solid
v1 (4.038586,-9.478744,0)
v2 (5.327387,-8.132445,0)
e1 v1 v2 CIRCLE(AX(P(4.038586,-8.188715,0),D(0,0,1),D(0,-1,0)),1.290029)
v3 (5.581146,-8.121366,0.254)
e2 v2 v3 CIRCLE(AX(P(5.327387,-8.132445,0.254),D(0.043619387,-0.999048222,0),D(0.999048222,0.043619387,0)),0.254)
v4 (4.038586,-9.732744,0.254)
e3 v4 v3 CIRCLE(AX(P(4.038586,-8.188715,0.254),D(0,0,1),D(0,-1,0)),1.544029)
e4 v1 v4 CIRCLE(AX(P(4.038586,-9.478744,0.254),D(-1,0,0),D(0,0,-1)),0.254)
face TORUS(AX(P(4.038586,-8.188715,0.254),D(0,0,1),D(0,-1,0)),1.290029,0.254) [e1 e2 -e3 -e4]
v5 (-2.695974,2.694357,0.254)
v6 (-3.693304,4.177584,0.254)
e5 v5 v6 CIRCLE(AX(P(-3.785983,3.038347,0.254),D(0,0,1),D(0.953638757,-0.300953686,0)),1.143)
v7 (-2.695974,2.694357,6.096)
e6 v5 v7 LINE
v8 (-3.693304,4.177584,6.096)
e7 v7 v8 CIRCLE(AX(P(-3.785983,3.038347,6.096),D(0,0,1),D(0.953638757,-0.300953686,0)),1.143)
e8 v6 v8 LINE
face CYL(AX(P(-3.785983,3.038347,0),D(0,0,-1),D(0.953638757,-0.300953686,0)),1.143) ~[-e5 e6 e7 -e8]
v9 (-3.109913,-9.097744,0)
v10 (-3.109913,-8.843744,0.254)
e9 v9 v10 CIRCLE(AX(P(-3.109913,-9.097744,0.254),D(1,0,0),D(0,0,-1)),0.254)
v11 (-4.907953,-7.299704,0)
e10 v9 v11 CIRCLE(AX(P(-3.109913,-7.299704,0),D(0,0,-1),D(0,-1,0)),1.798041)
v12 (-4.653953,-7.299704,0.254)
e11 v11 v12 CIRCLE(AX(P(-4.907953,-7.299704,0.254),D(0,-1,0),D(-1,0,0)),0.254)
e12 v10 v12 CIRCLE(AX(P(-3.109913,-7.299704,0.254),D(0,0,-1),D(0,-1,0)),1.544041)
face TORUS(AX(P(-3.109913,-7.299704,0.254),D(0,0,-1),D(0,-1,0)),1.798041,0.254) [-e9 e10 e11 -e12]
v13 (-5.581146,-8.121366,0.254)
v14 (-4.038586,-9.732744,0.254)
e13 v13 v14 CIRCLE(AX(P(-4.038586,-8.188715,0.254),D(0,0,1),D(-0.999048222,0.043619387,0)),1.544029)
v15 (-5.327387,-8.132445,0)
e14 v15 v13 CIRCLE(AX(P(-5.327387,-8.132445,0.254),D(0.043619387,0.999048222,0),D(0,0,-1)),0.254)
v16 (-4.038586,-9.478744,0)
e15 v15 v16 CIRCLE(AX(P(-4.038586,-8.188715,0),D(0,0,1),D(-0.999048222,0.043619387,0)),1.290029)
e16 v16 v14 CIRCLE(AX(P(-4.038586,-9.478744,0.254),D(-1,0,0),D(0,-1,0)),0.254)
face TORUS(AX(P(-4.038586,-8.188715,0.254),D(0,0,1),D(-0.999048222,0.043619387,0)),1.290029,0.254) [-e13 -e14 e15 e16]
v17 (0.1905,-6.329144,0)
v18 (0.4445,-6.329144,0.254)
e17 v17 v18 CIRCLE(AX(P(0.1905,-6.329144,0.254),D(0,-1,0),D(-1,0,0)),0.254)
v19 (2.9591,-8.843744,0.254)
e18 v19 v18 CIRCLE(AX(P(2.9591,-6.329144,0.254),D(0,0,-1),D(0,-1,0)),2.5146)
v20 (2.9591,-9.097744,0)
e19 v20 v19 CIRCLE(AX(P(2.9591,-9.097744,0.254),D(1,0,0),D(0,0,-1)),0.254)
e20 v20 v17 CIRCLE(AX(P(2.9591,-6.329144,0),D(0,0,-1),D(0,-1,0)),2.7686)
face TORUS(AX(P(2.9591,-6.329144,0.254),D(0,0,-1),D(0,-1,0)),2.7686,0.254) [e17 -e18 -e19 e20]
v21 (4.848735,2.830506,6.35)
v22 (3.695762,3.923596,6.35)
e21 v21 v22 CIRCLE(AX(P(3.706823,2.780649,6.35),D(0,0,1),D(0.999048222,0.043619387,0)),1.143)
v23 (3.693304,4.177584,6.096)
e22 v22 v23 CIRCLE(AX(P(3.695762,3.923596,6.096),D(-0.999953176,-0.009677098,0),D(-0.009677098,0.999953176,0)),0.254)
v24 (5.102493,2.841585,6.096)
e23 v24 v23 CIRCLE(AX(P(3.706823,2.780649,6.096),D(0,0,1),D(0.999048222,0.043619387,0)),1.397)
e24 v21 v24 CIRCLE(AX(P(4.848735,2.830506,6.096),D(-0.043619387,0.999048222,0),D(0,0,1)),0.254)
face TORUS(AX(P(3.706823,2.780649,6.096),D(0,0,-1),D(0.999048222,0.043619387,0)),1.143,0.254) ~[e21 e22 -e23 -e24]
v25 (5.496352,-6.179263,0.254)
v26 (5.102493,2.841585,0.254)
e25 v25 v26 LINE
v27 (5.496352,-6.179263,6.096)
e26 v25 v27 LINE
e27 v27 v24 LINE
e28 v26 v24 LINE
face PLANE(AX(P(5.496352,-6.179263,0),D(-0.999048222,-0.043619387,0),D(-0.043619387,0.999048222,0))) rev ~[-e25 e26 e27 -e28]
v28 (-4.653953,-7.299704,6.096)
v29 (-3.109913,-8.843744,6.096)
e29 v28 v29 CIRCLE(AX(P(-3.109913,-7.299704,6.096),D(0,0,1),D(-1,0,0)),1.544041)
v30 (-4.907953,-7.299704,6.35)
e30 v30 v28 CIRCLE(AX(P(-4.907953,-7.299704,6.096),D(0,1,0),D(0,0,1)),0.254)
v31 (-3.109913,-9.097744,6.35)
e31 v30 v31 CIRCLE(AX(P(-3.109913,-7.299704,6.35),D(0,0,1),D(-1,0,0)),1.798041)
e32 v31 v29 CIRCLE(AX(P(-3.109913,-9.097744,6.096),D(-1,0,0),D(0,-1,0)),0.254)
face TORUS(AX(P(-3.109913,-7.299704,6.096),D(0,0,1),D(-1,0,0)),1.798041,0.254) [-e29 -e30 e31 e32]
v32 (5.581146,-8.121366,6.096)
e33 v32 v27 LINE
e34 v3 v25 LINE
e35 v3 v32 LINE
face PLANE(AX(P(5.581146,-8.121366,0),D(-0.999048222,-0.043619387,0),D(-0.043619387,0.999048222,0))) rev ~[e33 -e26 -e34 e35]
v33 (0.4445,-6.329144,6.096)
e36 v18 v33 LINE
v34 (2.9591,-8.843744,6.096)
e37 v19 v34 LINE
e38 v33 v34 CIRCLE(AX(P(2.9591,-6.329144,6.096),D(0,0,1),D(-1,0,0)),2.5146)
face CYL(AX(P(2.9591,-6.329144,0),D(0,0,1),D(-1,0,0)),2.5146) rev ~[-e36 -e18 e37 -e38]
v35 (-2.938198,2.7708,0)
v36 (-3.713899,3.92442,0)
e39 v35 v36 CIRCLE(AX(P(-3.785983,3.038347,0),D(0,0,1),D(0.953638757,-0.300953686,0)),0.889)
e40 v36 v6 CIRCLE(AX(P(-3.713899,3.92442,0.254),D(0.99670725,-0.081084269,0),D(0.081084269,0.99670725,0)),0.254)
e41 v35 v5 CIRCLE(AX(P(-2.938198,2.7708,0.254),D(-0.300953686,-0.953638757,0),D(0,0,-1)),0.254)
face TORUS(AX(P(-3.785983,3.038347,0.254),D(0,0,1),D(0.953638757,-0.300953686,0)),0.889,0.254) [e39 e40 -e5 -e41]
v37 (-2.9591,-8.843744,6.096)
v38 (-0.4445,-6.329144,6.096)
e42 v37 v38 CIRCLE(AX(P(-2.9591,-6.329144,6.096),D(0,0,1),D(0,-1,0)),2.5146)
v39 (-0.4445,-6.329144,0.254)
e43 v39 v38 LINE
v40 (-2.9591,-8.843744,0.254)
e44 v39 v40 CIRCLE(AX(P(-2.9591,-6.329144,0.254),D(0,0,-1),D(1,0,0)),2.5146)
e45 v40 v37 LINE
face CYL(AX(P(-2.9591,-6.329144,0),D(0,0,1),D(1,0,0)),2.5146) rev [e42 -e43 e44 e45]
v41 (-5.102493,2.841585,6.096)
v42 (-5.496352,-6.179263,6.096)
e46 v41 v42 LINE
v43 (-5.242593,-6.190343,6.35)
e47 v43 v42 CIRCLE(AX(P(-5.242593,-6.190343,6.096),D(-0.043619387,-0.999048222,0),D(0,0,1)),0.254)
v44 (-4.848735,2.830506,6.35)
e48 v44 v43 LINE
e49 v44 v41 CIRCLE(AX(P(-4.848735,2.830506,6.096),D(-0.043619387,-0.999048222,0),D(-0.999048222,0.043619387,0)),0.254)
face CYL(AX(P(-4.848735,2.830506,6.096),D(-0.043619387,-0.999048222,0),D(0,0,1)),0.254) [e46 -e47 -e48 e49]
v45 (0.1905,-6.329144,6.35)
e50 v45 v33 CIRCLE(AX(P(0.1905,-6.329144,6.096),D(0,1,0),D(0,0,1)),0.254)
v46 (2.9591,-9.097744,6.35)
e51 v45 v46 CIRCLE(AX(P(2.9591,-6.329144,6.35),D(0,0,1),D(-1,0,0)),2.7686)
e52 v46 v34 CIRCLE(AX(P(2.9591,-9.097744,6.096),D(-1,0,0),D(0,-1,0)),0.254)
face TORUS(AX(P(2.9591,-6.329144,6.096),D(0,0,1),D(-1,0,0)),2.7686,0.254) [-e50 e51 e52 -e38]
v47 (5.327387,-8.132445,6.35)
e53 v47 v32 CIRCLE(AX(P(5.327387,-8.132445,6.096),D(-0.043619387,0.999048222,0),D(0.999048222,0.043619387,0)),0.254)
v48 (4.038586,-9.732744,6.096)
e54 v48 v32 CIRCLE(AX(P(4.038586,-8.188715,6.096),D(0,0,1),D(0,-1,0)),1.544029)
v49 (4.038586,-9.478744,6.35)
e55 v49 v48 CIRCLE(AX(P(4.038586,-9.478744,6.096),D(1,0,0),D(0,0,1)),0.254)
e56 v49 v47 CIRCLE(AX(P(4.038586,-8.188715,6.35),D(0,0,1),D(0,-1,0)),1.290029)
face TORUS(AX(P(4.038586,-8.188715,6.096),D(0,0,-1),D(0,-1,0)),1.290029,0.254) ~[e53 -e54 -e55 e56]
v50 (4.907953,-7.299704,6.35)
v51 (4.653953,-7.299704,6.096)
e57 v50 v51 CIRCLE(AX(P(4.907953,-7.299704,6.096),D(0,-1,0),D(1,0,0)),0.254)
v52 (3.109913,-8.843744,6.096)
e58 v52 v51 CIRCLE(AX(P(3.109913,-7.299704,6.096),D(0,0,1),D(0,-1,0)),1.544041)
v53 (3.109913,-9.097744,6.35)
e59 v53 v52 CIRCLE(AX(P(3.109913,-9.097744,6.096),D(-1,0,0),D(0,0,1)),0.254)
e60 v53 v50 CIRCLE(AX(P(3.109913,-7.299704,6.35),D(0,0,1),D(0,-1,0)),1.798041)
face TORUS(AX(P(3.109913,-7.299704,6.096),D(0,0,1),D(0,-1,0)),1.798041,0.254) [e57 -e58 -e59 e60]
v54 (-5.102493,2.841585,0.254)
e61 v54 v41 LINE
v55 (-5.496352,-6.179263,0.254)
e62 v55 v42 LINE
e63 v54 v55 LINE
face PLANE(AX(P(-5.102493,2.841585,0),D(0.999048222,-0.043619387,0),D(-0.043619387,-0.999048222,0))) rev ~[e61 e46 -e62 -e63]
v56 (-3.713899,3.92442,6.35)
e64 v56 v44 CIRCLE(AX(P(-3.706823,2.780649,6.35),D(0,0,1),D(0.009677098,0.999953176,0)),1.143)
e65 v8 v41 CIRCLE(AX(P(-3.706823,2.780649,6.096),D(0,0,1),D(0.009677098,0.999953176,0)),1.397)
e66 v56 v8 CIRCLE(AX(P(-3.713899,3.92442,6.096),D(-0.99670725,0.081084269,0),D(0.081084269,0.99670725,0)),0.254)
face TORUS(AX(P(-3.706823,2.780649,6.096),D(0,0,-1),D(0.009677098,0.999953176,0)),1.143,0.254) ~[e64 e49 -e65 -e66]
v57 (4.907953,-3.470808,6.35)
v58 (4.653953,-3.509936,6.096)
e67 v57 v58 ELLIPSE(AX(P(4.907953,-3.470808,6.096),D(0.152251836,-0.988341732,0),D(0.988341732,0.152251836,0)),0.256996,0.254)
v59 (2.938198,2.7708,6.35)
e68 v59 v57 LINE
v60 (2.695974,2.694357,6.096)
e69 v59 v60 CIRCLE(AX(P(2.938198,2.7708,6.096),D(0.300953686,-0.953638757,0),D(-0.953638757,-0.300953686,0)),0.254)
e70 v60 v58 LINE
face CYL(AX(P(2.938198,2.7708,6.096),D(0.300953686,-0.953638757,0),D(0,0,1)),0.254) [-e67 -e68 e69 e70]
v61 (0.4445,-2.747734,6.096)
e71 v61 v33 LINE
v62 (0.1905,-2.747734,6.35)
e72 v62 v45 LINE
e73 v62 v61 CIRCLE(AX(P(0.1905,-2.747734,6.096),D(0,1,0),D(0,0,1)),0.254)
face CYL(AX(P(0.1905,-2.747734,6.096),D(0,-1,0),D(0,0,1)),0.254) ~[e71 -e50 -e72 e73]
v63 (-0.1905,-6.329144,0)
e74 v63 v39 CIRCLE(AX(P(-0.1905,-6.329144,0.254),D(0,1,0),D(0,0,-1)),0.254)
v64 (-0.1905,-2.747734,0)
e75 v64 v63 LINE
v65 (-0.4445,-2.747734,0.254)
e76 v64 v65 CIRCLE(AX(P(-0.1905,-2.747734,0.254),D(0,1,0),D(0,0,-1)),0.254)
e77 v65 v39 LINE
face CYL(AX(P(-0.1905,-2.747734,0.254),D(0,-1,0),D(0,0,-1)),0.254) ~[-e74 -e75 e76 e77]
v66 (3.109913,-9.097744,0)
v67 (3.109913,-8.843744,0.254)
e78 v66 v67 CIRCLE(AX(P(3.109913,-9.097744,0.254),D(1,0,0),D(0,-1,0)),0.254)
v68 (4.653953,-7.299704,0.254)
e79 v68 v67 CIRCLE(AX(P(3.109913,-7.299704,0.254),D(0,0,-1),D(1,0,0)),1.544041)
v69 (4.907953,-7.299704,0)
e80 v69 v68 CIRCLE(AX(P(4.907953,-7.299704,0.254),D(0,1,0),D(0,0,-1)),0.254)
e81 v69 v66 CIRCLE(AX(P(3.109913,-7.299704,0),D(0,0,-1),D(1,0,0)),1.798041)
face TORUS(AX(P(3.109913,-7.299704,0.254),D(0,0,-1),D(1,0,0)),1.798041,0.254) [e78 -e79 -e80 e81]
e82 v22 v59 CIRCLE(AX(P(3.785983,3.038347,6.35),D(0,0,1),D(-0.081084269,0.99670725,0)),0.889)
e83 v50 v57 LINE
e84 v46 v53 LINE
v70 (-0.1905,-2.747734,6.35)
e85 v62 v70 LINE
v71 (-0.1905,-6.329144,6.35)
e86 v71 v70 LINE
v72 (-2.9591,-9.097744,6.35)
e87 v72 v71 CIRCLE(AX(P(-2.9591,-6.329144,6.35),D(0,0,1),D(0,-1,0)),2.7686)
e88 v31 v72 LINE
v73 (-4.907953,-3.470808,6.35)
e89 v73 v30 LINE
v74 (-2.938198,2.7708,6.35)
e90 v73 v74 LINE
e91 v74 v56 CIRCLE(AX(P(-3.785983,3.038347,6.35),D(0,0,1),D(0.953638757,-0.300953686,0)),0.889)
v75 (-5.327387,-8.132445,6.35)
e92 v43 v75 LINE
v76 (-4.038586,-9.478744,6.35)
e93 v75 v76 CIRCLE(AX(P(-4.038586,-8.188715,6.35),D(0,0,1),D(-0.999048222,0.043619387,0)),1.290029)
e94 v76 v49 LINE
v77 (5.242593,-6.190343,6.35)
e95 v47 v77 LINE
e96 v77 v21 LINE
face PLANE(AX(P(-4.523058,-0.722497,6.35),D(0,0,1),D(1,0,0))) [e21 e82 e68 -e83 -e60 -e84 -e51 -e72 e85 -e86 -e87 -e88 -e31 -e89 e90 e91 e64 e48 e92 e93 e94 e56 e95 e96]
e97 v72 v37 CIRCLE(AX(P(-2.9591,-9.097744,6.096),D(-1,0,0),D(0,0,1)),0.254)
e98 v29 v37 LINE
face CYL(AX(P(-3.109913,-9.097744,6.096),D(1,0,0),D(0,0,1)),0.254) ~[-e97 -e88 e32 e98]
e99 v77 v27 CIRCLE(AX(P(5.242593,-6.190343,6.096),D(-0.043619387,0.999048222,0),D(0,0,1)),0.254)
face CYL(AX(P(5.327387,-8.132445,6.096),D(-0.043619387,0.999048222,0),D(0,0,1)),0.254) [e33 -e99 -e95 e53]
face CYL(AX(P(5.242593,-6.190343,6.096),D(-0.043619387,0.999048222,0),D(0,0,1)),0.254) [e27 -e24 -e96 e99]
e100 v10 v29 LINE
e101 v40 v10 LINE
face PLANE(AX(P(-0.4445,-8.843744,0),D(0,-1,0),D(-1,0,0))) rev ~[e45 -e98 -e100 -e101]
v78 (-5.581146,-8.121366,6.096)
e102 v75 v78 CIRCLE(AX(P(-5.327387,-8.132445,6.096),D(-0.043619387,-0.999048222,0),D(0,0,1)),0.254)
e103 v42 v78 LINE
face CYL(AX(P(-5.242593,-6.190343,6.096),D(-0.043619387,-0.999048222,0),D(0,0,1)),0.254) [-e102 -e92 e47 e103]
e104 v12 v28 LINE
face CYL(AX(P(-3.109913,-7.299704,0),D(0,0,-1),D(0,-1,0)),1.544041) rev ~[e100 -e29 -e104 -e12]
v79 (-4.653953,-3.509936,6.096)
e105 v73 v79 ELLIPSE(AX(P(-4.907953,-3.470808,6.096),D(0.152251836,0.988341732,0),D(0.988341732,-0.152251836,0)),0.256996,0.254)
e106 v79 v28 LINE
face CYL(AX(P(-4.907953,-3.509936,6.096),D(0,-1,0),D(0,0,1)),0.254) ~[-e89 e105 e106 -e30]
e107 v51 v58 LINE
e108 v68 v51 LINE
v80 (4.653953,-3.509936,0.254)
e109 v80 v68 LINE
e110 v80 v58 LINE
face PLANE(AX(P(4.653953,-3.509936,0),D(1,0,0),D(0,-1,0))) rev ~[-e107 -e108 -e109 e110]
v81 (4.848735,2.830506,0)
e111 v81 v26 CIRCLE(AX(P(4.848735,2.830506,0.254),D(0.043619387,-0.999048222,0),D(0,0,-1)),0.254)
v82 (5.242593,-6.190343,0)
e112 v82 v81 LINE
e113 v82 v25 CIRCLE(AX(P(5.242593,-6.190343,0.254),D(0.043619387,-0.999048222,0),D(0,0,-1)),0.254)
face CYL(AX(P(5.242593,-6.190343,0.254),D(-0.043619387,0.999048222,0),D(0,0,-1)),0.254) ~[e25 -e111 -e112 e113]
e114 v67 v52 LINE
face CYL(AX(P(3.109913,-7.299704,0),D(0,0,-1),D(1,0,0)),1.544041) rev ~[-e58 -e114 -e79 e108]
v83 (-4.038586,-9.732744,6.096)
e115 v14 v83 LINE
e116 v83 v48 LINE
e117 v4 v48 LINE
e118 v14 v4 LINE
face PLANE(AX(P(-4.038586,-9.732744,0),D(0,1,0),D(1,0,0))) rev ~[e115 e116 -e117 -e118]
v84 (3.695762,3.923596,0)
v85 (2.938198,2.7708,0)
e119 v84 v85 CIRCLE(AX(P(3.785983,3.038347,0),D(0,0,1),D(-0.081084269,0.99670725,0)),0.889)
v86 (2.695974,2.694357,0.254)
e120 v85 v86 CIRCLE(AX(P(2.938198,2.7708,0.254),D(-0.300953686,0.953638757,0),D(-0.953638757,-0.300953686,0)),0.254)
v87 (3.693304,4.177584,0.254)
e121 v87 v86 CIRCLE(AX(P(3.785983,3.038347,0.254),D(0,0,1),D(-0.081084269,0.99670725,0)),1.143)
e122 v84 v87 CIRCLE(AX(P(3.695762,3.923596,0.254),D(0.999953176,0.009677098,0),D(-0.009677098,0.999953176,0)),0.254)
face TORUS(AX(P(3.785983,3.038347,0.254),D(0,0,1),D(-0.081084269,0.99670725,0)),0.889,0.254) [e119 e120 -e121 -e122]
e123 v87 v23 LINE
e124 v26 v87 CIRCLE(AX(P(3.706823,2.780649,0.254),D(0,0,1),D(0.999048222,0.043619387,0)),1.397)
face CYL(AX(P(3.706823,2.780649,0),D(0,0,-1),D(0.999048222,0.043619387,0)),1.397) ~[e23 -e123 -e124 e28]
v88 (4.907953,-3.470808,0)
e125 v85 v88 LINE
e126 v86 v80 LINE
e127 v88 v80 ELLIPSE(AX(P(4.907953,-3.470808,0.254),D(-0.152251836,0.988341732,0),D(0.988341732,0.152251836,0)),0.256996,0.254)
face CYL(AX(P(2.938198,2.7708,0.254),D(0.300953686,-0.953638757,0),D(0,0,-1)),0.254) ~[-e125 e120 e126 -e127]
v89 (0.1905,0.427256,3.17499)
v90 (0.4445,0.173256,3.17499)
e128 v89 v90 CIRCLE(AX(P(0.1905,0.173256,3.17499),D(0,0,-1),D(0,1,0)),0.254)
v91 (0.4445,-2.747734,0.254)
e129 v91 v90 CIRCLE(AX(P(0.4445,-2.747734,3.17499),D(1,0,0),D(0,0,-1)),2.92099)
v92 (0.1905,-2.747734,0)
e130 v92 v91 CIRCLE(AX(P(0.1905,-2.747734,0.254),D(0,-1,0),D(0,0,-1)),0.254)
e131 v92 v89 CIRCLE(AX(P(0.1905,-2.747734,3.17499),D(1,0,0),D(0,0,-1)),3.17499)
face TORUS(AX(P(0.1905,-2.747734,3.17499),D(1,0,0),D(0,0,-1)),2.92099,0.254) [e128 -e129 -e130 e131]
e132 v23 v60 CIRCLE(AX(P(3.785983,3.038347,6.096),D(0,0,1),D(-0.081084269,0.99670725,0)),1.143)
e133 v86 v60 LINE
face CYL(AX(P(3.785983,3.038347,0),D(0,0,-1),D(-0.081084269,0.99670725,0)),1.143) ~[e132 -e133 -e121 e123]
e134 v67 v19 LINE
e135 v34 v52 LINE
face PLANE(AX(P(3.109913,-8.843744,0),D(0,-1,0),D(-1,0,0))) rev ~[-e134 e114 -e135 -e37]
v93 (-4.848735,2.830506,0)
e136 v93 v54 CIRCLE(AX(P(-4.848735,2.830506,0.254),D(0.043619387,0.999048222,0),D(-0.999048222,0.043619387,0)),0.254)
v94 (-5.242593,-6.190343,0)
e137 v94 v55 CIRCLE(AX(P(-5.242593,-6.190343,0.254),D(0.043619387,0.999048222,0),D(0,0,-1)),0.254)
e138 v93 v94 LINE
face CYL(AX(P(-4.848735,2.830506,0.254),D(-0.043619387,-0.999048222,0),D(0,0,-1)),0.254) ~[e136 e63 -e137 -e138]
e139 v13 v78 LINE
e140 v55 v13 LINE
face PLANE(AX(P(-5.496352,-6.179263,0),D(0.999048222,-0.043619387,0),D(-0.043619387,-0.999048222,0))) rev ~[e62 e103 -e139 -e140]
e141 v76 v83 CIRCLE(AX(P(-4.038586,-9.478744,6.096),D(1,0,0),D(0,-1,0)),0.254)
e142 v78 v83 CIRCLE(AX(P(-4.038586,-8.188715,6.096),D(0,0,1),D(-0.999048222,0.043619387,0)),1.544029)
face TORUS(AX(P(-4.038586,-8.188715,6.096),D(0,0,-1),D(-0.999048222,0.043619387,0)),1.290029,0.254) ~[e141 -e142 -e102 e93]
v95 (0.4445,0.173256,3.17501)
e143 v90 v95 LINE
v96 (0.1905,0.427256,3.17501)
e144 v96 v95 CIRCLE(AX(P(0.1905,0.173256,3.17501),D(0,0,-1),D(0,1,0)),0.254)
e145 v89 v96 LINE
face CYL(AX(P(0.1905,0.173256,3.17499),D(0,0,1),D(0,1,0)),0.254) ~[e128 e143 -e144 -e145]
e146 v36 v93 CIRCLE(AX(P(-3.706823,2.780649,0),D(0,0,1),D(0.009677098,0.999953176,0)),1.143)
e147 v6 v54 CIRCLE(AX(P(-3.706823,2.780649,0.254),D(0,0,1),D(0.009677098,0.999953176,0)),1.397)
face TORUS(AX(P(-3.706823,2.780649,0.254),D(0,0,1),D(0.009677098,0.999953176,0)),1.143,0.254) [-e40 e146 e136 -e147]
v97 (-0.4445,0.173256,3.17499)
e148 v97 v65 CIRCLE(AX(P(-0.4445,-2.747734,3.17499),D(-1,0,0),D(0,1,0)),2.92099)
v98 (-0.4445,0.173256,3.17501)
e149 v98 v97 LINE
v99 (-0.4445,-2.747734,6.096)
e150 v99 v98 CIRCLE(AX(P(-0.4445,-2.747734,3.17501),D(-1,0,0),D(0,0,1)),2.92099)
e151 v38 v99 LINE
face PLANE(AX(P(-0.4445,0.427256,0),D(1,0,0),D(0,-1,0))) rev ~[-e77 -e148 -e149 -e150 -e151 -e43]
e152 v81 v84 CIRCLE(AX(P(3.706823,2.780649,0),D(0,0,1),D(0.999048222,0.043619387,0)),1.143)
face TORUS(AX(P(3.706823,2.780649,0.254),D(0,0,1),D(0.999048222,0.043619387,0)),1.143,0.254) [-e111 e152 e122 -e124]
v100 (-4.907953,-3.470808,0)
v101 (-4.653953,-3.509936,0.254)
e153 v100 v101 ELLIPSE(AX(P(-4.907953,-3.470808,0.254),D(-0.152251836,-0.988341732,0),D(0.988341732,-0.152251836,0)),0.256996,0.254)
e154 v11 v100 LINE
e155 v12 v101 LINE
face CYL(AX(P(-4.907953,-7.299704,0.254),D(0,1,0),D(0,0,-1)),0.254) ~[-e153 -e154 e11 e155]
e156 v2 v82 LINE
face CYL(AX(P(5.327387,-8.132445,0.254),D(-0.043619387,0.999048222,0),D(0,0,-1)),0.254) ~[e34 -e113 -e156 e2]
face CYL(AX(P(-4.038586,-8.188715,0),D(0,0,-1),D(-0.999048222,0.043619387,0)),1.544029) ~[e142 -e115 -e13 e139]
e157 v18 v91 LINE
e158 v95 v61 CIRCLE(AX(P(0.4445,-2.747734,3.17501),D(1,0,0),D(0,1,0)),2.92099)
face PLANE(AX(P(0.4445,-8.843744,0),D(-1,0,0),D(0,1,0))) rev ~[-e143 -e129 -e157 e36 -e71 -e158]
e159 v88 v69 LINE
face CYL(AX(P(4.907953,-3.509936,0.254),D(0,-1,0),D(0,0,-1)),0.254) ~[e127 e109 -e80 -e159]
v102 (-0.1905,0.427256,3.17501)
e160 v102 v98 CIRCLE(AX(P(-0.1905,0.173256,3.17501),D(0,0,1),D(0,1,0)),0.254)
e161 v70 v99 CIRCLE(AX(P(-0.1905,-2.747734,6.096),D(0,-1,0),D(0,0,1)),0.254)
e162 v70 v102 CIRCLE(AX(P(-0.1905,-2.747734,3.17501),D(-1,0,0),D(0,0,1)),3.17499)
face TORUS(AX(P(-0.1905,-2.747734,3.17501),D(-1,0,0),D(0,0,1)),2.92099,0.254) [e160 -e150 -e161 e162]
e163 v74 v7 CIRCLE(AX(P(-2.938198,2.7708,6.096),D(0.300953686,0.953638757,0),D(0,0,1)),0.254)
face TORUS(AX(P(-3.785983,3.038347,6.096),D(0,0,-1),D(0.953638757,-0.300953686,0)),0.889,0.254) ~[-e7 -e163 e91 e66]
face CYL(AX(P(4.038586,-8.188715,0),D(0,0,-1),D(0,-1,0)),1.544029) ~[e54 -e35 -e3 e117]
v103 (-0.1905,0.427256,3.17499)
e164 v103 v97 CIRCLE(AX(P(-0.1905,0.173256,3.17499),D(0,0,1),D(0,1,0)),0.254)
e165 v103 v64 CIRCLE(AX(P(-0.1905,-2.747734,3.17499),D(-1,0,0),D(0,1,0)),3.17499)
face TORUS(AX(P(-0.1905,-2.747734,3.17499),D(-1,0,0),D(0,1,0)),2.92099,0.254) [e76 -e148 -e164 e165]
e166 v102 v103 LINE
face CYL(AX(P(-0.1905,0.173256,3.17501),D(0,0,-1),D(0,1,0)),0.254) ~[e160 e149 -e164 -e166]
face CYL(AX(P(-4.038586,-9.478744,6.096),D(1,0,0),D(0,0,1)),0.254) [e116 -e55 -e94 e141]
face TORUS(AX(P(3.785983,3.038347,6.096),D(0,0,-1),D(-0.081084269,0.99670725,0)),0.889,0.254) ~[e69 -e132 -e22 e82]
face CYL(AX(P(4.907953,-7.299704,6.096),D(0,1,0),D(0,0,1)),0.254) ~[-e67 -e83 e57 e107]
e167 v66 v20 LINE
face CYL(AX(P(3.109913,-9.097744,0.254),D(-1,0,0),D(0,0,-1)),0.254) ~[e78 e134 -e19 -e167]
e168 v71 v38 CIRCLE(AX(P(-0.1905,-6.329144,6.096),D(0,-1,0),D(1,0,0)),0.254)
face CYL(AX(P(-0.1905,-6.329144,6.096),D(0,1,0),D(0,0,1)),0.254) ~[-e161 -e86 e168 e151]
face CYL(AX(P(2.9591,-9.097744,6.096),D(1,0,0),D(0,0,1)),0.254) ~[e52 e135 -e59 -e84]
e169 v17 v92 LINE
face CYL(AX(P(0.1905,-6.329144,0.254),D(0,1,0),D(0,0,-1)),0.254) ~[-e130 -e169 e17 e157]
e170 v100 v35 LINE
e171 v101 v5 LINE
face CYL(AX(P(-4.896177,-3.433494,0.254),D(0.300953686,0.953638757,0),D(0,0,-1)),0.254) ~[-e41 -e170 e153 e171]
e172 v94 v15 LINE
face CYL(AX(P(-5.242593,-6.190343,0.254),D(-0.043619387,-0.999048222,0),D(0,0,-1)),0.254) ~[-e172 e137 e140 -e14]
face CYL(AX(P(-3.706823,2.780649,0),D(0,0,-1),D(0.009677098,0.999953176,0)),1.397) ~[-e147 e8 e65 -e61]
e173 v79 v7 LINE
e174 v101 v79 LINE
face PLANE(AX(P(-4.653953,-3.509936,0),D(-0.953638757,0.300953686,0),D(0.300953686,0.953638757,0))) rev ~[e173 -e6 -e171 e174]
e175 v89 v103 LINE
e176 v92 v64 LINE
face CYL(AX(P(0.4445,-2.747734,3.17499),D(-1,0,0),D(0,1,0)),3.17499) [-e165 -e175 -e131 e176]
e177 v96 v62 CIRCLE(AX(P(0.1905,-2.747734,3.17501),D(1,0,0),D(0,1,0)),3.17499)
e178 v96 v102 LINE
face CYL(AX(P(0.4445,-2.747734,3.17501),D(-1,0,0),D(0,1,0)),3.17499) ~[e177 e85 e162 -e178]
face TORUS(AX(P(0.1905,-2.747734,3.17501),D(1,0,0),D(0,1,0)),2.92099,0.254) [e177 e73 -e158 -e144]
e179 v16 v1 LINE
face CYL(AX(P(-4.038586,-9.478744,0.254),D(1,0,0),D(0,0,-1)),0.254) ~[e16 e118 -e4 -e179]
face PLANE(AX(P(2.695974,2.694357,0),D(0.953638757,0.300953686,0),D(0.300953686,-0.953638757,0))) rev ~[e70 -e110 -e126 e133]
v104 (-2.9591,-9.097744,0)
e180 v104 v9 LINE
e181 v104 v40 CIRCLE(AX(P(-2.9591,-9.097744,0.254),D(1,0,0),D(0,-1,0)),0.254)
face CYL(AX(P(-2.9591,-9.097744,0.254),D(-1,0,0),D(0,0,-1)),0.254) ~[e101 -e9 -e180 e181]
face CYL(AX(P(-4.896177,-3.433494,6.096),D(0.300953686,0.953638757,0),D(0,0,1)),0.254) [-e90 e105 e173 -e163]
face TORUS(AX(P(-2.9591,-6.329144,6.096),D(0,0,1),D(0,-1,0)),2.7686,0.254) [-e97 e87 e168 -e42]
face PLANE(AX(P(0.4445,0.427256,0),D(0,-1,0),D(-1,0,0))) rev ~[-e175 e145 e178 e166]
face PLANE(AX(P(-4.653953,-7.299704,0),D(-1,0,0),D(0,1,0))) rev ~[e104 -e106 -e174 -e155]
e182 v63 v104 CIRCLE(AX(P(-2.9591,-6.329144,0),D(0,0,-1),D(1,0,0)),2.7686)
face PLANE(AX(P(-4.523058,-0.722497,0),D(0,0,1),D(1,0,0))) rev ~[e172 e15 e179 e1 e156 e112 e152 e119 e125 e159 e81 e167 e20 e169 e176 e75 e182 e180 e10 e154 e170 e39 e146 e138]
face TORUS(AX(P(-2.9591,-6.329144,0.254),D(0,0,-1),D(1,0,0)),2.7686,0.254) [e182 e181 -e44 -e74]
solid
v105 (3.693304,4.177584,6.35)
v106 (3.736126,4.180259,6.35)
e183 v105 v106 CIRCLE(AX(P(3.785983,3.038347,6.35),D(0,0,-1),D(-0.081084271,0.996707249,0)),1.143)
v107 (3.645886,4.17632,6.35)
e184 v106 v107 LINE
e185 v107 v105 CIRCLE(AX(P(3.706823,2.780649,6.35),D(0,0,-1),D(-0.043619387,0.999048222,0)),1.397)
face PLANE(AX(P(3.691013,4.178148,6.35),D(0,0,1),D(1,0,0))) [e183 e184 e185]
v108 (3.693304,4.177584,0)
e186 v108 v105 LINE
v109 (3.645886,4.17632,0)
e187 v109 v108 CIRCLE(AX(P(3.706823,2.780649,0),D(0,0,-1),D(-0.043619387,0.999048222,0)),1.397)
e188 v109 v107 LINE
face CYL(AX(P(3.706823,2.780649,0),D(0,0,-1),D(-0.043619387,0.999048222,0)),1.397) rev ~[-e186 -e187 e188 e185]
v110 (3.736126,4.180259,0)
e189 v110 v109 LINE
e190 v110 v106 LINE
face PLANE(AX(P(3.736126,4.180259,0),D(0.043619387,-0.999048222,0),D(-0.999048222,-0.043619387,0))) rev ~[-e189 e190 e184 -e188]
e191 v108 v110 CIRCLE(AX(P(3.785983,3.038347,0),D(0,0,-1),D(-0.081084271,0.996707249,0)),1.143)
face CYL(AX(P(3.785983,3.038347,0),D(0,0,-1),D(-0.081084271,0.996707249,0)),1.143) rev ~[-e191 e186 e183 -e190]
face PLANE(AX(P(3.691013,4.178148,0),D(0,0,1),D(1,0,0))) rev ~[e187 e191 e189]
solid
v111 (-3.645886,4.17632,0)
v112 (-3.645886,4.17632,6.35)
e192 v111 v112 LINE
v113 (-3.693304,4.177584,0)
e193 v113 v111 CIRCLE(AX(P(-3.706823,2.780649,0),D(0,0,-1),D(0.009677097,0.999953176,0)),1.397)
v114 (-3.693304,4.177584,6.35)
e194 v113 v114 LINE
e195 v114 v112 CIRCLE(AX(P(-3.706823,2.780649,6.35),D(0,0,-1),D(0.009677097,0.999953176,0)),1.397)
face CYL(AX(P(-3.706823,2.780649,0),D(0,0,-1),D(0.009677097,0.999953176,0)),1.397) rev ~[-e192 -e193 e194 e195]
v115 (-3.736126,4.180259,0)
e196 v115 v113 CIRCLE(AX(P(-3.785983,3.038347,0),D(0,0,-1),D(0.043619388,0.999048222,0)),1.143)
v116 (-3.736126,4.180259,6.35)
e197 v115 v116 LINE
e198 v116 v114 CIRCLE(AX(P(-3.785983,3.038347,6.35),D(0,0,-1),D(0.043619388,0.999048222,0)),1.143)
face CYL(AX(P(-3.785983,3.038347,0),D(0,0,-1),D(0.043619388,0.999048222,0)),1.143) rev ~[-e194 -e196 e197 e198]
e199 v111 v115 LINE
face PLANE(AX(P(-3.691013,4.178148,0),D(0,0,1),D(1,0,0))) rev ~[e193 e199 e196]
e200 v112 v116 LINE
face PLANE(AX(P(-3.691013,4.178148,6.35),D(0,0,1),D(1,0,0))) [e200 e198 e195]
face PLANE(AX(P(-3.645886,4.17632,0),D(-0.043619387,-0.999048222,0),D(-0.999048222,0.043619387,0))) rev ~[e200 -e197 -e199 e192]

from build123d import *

# Parameters (mm, degrees)
F1_DEPTH = 6.35
F2_R     = 3.17499
F3_R     = 2.5146
F4_R     = 0.254


# Not quite as in the source:
# - a fillet or chamfer is up to 0.001 mm smaller than in the source, because OpenCascade refuses the exact size


with BuildPart() as f1:
    # F0 (on Top) → F1 (new body)
    with BuildSketch(Plane.XY):
        with BuildLine():
            ThreePointArc((-3.693303641, 4.1775837632), (-4.6679721343, 3.794454123), (-5.1024929117, 2.8415854608))
            Line((-5.1024929117, 2.8415854608), (-5.4963516714, -6.179263229))
            Line((-5.4963516714, -6.179263229), (-4.6539532316, -3.5099362281))
            Line((-4.6539532316, -3.5099362281), (-2.6959738617, 2.6943573136))
            ThreePointArc((-2.6959738617, 2.6943573136), (-2.8374693082, 3.6761332742), (-3.693303641, 4.1775837632))
        make_face()
        with BuildLine():
            Line((-4.6539532316, -3.5099362281), (-5.4963516714, -6.179263229))
            Line((-5.4963516714, -6.179263229), (-5.5811456925, -8.1213656104))
            ThreePointArc((-5.5811456925, -8.1213656104), (-5.1539371815, -9.2564313962), (-4.0385863003, -9.7327441736))
            Line((-4.0385863003, -9.7327441736), (0, -9.7327441736))
            Line((0, -9.7327441736), (0, 0.4272558264))
            Line((0, 0.4272558264), (-0.4445, 0.4272558264))
            Line((-0.4445, 0.4272558264), (-0.4445, -8.8437441736))
            Line((-0.4445, -8.8437441736), (-3.1099126316, -8.8437441736))
            ThreePointArc((-3.1099126316, -8.8437441736), (-4.2017142103, -8.3915051523), (-4.6539532316, -7.2997035736))
            Line((-4.6539532316, -7.2997035736), (-4.6539532316, -3.5099362281))
        make_face()
        with BuildLine():
            Line((0, 0.4272558264), (0, -9.7327441736))
            Line((0, -9.7327441736), (4.0385863003, -9.7327441736))
            ThreePointArc((4.0385863003, -9.7327441736), (5.1539371815, -9.2564313962), (5.5811456925, -8.1213656104))
            Line((5.5811456925, -8.1213656104), (5.4963516714, -6.179263229))
            Line((5.4963516714, -6.179263229), (4.6539532316, -3.5099362281))
            Line((4.6539532316, -3.5099362281), (4.6539532316, -7.2997035736))
            ThreePointArc((4.6539532316, -7.2997035736), (4.2017142103, -8.3915051523), (3.1099126316, -8.8437441736))
            Line((3.1099126316, -8.8437441736), (0.4445, -8.8437441736))
            Line((0.4445, -8.8437441736), (0.4445, 0.4272558264))
            Line((0.4445, 0.4272558264), (0, 0.4272558264))
        make_face()
        with BuildLine():
            Line((4.6539532316, -3.5099362281), (5.4963516714, -6.179263229))
            Line((5.4963516714, -6.179263229), (5.1024929117, 2.8415854608))
            ThreePointArc((5.1024929117, 2.8415854608), (4.6679721343, 3.794454123), (3.693303641, 4.1775837632))
            ThreePointArc((3.693303641, 4.1775837632), (2.8374693082, 3.6761332742), (2.6959738617, 2.6943573136))
            Line((2.6959738617, 2.6943573136), (4.6539532316, -3.5099362281))
        make_face()
    extrude(amount=F1_DEPTH)

    # F2 (radius 3.175 in the source; OpenCascade refuses exactly that, so slightly less here)
    f2_edges = [f1.edges().sort_by_distance(p)[0] for p in [
        (0, 0.427256, 6.35),
        (0, 0.427256, 0),
    ]]
    fillet(f2_edges, radius=F2_R)

    # F3
    f3_edges = [f1.edges().sort_by_distance(p)[0] for p in [
        (-0.4445, -8.843744, 3.175),
        (0.4445, -8.843744, 3.175),
    ]]
    fillet(f3_edges, radius=F3_R)

    # F4
    f4_edges = [f1.edges().sort_by_distance(p)[0] for p in [
        (3.674964, -0.407789, 0),
        (5.341819, -2.63989, 0),
        (4.667972, 3.794454, 0),
        (2.837469, 3.676133, 0),
        (4.653953, -5.40482, 0),
        (4.201714, -8.391505, 0),
        (0.4445, -4.538439, 0),
        (1.181009, -8.107235, 0),
        (0, -2.747734, 0),
        (3.034506, -8.843744, 0),
        (-0.4445, -4.538439, 0),
        (-1.181009, -8.107235, 0),
        (-3.034506, -8.843744, 0),
        (-4.201714, -8.391505, 0),
        (-4.653953, -5.40482, 0),
        (-3.674964, -0.407789, 0),
        (-2.837469, 3.676133, 0),
        (5.153937, -9.256431, 0),
        (-4.667972, 3.794454, 0),
        (0, -9.732744, 0),
        (-5.341819, -2.63989, 0),
        (-5.153937, -9.256431, 0),
        (0.4445, -4.538439, 6.35),
        (1.181009, -8.107235, 6.35),
        (0, -2.747734, 6.35),
        (3.034506, -8.843744, 6.35),
        (-0.4445, -4.538439, 6.35),
        (4.201714, -8.391505, 6.35),
        (-1.181009, -8.107235, 6.35),
        (4.653953, -5.40482, 6.35),
        (-3.034506, -8.843744, 6.35),
        (3.674964, -0.407789, 6.35),
        (-4.201714, -8.391505, 6.35),
        (2.837469, 3.676133, 6.35),
        (-4.653953, -5.40482, 6.35),
        (4.667972, 3.794454, 6.35),
        (-3.674964, -0.407789, 6.35),
        (5.341819, -2.63989, 6.35),
        (-2.837469, 3.676133, 6.35),
        (5.153937, -9.256431, 6.35),
        (-4.667972, 3.794454, 6.35),
        (0, -9.732744, 6.35),
        (-5.341819, -2.63989, 6.35),
        (-5.153937, -9.256431, 6.35),
        (0.4445, -0.502677, 0.929933),
        (0.4445, 0.427256, 3.175),
        (0.4445, -0.502677, 5.420067),
        (-0.4445, -0.502677, 0.929933),
        (-0.4445, 0.427256, 3.175),
        (-0.4445, -0.502677, 5.420067),
    ]]
    fillet(f4_edges, radius=F4_R)


with BuildPart() as f1b:
    # F0 (on Top) → F1, piece 2 (new body)
    with BuildSketch(Plane.XY):
        with BuildLine():
            ThreePointArc((-3.7361260011, 4.1802594943), (-3.7147022648, 4.1791225794), (-3.693303641, 4.1775837632))
            ThreePointArc((-3.693303641, 4.1775837632), (-3.6695895854, 4.1771529205), (-3.645886262, 4.1763195422))
            Line((-3.645886262, 4.1763195422), (-3.7361260011, 4.1802594943))
        make_face()
    extrude(amount=F1_DEPTH)


with BuildPart() as f1c:
    # F0 (on Top) → F1, piece 3 (new body)
    with BuildSketch(Plane.XY):
        with BuildLine():
            ThreePointArc((3.645886262, 4.1763195422), (3.6695895854, 4.1771529205), (3.693303641, 4.1775837632))
            ThreePointArc((3.693303641, 4.1775837632), (3.7147022648, 4.1791225794), (3.7361260011, 4.1802594943))
            Line((3.7361260011, 4.1802594943), (3.645886262, 4.1763195422))
        make_face()
    extrude(amount=F1_DEPTH)


solid = Compound([f1.part, f1b.part, f1c.part])
